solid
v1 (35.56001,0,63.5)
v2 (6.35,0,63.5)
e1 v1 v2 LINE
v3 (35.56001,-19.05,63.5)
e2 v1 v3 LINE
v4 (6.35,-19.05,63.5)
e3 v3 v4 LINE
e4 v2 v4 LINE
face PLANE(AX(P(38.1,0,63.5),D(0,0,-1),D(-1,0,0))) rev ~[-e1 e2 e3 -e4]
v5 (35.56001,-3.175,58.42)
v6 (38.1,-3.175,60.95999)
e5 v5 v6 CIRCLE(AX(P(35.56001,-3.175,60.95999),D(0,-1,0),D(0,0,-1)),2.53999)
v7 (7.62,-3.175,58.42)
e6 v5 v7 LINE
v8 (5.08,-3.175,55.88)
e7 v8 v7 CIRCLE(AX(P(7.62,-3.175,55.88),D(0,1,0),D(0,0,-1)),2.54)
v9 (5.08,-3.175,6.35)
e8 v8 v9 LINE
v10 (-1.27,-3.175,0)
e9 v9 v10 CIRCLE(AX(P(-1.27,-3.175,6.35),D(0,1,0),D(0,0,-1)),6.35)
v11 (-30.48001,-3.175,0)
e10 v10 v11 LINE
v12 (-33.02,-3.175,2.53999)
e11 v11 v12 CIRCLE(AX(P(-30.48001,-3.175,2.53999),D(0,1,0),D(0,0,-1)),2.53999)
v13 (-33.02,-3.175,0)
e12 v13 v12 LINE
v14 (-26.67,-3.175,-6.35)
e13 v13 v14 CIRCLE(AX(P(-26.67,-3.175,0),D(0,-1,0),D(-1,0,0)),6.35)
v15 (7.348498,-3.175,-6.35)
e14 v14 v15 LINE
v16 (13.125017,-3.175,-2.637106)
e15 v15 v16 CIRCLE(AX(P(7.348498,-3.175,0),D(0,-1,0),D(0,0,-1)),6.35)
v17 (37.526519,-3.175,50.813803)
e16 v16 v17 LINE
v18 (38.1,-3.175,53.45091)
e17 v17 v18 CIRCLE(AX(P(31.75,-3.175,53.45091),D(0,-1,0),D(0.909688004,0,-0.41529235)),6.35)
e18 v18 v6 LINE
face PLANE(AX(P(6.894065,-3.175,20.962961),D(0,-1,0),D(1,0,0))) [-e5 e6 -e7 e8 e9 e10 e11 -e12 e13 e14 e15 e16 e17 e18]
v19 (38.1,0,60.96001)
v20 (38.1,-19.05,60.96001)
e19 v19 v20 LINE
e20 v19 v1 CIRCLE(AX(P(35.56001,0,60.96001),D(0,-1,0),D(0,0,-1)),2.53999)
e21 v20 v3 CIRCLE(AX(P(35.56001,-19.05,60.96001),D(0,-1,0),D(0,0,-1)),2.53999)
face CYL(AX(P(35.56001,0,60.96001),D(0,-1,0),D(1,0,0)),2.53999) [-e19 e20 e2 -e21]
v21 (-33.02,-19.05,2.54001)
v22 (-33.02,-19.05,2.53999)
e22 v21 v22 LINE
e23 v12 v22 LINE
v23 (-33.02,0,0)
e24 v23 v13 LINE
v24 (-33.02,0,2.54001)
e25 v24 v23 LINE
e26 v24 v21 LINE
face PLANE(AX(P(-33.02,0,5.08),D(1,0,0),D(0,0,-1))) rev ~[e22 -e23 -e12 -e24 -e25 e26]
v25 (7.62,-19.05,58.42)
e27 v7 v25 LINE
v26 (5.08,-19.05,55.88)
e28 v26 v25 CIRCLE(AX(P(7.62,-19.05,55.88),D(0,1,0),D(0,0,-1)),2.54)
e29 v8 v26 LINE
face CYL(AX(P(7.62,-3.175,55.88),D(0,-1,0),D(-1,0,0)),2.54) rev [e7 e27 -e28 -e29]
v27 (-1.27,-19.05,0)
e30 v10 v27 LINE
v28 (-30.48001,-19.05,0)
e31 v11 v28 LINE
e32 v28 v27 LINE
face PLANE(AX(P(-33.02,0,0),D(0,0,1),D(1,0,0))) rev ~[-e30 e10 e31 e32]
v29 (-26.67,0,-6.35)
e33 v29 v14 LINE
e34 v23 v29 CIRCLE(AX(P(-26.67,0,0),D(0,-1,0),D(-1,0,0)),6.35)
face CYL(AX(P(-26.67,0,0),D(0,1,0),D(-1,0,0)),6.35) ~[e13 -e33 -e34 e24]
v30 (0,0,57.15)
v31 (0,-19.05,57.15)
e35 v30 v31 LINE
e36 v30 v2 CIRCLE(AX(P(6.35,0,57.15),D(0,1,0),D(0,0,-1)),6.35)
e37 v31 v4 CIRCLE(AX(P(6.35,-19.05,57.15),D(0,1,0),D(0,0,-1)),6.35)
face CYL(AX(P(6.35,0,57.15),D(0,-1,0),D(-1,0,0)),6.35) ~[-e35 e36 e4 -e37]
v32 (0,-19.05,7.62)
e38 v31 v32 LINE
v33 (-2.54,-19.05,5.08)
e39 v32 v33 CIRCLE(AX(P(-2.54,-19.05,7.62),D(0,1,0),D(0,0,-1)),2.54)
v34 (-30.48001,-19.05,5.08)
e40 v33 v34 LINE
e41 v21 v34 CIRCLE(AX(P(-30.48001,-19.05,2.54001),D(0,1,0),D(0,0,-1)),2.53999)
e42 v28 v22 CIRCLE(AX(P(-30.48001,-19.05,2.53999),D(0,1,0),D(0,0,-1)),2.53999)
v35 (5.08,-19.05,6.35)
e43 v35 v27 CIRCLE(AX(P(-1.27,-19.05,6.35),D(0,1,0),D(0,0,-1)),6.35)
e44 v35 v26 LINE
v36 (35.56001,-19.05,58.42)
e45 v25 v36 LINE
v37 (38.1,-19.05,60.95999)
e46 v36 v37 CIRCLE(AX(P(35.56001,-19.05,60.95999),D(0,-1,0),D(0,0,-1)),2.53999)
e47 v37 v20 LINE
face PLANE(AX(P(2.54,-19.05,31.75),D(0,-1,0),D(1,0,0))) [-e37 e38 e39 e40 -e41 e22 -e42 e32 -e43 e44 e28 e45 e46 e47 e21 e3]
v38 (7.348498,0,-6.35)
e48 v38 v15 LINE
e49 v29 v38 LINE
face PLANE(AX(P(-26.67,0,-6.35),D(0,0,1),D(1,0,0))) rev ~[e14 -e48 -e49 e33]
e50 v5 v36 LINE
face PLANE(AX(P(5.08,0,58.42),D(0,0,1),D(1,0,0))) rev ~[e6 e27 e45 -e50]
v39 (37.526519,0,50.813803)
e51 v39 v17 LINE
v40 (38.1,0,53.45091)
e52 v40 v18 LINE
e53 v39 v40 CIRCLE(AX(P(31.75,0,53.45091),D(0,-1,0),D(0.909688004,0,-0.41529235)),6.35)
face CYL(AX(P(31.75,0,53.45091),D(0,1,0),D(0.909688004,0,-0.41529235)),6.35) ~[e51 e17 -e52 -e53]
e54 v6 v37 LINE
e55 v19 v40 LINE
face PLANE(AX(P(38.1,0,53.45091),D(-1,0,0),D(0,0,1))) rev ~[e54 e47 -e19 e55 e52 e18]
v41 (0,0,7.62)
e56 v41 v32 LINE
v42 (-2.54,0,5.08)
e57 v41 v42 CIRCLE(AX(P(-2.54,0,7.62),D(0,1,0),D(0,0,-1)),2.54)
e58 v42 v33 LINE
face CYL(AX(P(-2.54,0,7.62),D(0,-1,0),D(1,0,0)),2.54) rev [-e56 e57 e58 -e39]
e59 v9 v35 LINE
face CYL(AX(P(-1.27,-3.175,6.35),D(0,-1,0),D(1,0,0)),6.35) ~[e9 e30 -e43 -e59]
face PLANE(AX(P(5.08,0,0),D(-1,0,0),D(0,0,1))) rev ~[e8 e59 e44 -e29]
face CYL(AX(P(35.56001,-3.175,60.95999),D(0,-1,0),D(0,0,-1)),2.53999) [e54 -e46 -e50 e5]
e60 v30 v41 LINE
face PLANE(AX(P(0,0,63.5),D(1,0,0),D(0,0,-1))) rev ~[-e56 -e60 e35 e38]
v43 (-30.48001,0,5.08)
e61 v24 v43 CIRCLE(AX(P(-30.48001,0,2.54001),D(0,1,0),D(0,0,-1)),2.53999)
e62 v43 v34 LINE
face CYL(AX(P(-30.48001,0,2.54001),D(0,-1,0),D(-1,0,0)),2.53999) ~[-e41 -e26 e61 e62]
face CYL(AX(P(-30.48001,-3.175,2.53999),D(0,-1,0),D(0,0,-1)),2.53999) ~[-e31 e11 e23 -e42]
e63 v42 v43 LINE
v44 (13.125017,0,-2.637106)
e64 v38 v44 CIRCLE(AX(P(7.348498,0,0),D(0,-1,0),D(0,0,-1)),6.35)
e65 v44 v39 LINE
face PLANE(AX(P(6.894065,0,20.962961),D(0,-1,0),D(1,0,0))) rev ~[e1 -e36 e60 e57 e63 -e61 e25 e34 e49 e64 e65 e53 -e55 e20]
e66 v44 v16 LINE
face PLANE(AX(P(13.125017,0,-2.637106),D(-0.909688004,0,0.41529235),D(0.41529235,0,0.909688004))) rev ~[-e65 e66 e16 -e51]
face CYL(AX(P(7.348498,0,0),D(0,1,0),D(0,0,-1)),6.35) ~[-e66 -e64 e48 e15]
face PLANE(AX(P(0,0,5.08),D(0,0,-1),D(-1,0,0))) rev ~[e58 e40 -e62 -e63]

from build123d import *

# Parameters (mm, degrees)
F1_DEPTH = 19.05
F2_DEPTH = 3.175
F3_R     = 6.35
F4_R     = 2.53999
F5_R     = 2.54


# Not quite as in the source:
# - a fillet or chamfer is up to 0.001 mm smaller than in the source, because OpenCascade refuses the exact size


with BuildPart() as f1:
    # F0 (on Front) → F1 (new body)
    with BuildSketch(Plane.XZ):
        Polygon((-33.02, 0), (0, 0), (5.08, 0), (5.08, 5.08), (5.08, 58.42), (38.1, 58.42), (38.1, 63.5), (5.08, 63.5), (0, 63.5), (0, 58.42), (0, 5.08), (-33.02, 5.08), align=None)
    extrude(amount=F1_DEPTH)

    # F0 (on Front) → F2 (join)
    with BuildSketch(Plane.XZ):
        with BuildLine():
            Line((5.08, 0), (0, 0))
            Line((0, 0), (-33.02, 0))
            ThreePointArc((-33.02, 0), (-31.1601280605, -4.4901280605), (-26.67, -6.35))
            Line((-26.67, -6.35), (7.3484978099, -6.35))
            ThreePointArc((7.3484978099, -6.35), (10.7819271621, -5.3417284546), (13.1250166344, -2.6371064199))
            Line((13.1250166344, -2.6371064199), (37.5265188245, 50.8138031394))
            ThreePointArc((37.5265188245, 50.8138031394), (37.9549735912, 52.1015383235), (38.1, 53.4509095593))
            Line((38.1, 53.4509095593), (38.1, 58.42))
            Line((38.1, 58.42), (5.08, 58.42))
            Line((5.08, 58.42), (5.08, 5.08))
            Line((5.08, 5.08), (5.08, 0))
        make_face()
    extrude(amount=F2_DEPTH)

    # F3
    f3_edges = [f1.edges().sort_by_distance(p)[0] for p in [
        (0, -9.525, 63.5),
        (5.08, -11.1125, 0),
    ]]
    fillet(f3_edges, radius=F3_R)

    # F4 (radius 2.54 in the source; OpenCascade refuses exactly that, so slightly less here)
    f4_edges = [f1.edges().sort_by_distance(p)[0] for p in [
        (-33.02, -11.1125, 0),
        (-33.02, -1.5875, 0),
        (-33.02, -9.525, 5.08),
        (38.1, -11.1125, 58.42),
        (38.1, -9.525, 63.5),
    ]]
    fillet(f4_edges, radius=F4_R)

    # F5
    f5_edges = [f1.edges().sort_by_distance(p)[0] for p in [
        (5.08, -11.1125, 58.42),
        (0, -9.525, 5.08),
    ]]
    fillet(f5_edges, radius=F5_R)


solid = f1.part
